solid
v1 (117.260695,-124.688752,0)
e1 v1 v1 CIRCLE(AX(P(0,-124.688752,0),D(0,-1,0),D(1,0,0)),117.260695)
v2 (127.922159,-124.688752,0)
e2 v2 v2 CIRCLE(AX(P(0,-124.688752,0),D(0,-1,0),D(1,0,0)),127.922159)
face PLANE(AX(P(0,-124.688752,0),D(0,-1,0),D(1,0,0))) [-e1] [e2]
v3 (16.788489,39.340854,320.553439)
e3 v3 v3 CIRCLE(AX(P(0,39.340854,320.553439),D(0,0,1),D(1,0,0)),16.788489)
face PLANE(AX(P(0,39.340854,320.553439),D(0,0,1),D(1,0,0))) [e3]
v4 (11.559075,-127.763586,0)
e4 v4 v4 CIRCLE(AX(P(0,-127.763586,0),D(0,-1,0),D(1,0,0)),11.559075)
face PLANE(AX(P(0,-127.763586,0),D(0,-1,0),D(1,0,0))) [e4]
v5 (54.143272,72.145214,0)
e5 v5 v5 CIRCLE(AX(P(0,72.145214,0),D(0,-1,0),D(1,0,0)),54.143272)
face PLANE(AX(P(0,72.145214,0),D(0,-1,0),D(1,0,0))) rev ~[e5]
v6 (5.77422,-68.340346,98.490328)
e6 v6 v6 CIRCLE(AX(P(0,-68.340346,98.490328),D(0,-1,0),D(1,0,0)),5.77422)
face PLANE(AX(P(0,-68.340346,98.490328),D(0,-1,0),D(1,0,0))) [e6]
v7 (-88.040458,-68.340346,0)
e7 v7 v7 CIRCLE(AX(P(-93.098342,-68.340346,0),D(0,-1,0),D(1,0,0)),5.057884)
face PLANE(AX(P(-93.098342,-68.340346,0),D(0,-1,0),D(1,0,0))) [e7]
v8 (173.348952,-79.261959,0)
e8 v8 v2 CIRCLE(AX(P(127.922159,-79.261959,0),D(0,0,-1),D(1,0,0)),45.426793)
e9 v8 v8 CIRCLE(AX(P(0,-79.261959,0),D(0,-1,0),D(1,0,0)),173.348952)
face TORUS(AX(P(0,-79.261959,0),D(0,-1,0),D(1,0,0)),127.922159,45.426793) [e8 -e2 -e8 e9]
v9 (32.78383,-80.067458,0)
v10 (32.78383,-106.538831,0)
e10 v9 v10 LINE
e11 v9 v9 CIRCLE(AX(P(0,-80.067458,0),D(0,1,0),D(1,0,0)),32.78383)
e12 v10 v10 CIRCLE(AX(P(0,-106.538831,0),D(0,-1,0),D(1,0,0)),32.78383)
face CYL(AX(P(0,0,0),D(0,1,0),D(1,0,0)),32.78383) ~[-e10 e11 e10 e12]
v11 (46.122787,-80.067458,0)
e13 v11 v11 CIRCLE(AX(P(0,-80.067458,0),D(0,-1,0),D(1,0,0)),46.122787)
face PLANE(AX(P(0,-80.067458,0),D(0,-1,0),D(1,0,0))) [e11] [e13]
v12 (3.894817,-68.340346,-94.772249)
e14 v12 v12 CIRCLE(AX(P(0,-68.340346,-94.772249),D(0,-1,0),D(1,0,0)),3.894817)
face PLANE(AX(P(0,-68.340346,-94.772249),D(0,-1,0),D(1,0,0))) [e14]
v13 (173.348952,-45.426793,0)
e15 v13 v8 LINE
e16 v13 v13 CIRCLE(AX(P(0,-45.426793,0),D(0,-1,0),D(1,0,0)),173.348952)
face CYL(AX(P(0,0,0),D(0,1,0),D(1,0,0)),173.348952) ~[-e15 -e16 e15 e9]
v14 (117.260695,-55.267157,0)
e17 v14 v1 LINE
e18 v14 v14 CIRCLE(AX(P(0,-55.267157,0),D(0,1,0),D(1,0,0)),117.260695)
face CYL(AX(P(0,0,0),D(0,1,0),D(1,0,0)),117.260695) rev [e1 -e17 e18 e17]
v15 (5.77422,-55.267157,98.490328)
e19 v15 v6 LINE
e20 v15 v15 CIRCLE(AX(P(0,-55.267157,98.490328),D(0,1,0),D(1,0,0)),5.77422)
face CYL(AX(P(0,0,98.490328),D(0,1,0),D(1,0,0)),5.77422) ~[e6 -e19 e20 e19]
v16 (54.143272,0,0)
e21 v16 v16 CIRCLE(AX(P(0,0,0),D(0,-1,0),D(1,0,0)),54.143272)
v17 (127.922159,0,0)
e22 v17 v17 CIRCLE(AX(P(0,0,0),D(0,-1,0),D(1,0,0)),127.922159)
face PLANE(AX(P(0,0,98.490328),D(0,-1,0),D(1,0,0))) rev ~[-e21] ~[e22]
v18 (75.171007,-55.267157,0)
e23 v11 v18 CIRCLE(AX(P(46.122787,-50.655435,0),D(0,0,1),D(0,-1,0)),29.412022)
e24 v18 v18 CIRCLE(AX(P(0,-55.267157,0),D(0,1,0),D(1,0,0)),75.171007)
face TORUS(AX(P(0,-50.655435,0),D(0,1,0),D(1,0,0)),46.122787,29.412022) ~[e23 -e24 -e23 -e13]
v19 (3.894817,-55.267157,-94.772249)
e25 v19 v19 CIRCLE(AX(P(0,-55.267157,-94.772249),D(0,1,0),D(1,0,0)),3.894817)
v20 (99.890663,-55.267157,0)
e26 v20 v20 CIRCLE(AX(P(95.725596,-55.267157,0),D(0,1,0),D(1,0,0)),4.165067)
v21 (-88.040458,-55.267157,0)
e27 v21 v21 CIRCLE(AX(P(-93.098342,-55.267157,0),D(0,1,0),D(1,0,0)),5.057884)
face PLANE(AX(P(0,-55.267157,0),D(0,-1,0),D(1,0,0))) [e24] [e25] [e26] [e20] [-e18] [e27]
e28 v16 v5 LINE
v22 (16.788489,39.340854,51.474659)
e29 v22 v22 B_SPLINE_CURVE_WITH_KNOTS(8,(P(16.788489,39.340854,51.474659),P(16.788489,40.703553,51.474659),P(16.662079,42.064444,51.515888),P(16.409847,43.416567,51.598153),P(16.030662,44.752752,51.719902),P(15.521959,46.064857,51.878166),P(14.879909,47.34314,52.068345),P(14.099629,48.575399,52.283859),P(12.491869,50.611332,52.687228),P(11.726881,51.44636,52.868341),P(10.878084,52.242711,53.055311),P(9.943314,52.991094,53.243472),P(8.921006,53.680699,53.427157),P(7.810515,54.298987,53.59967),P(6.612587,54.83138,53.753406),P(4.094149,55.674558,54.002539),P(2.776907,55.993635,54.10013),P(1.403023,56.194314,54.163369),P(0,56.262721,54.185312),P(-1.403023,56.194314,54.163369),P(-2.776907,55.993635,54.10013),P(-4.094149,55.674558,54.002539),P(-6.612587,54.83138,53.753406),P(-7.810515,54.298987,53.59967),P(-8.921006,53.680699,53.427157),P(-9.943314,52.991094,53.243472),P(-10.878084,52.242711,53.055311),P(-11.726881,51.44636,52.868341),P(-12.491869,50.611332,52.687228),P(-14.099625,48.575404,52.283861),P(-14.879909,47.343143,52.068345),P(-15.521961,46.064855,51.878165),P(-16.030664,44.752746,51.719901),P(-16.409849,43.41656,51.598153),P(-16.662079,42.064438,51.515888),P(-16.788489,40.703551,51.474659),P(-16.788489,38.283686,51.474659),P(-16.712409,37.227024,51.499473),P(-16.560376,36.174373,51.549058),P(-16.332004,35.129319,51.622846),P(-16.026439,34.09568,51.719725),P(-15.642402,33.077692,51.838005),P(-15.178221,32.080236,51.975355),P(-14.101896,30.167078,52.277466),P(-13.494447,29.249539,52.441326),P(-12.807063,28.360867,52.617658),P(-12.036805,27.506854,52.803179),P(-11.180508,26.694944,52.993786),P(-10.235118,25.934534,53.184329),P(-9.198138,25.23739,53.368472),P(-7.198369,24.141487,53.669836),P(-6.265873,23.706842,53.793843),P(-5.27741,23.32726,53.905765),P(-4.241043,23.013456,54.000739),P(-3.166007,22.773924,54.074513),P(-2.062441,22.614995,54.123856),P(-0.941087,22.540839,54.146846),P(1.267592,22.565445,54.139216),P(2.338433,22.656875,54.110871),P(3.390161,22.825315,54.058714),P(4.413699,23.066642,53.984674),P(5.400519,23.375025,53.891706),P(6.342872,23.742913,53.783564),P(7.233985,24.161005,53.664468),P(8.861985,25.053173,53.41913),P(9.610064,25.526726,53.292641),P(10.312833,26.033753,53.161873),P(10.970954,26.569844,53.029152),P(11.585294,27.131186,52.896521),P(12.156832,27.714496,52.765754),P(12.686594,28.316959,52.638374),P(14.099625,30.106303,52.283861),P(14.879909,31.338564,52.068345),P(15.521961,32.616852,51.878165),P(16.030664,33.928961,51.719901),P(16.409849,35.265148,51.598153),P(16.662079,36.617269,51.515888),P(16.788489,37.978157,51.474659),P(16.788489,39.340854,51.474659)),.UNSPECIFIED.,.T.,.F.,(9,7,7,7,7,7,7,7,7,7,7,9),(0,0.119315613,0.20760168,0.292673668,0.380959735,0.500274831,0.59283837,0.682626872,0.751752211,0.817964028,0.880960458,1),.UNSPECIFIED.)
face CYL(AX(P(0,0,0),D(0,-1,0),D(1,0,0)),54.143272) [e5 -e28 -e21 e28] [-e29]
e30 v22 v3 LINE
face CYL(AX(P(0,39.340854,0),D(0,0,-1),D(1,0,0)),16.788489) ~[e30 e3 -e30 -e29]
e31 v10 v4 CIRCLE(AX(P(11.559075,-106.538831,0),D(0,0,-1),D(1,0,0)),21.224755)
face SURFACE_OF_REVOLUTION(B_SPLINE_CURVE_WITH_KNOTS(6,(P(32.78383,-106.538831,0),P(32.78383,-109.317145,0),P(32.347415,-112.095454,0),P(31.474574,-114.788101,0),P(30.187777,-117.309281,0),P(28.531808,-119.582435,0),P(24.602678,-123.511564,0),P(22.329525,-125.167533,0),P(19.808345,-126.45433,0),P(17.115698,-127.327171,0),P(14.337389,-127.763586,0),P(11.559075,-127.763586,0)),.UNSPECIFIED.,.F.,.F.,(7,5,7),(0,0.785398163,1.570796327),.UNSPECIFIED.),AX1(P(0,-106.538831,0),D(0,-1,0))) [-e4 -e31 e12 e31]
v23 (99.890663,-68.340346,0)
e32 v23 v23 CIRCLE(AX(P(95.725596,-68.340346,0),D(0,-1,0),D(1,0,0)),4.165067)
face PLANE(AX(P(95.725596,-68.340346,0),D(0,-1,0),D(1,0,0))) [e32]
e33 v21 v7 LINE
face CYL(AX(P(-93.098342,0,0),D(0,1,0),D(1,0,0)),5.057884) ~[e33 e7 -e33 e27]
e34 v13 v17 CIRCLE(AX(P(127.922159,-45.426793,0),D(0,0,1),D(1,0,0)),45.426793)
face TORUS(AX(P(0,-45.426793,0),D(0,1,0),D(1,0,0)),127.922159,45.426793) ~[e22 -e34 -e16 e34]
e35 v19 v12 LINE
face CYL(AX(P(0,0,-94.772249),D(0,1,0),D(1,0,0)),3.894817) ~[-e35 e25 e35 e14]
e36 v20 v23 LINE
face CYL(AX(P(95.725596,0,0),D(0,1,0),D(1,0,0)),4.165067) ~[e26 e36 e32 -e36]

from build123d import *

# Parameters (mm, degrees)
F0_R      = 173.3489517692
F0_R_2    = 117.2606948697
F1_DEPTH  = 124.6887519956
F2_R      = 45.426792545
F3_R      = 121.2481204934
F4_DEPTH  = 55.2671570331
F5_R      = 75.1710071643
F6_DEPTH  = 80.0674576312
F7_R      = 32.7838298789
F8_DEPTH  = 127.7635861188
F9_R      = 21.2247552793
F11_R     = 54.14327209
F12_DEPTH = 72.1452143043
F13_R     = 16.7884886241
F14_DEPTH = 320.553438738
F15_R     = 5.7742203186
F15_R_2   = 5.0578841716
F15_R_3   = 3.8948170444
F15_R_4   = 4.1650665602
F16_DEPTH = 68.3403462172


# Not quite as in the source:
# - a fillet or chamfer that OpenCascade refuses, or shapes differently, is made with other operations: its cross-section is extruded or revolved along the edge and cut away or added


with BuildPart() as f1:
    # F0 (on Front) → F1 (new body)
    with BuildSketch(Plane.XZ):
        Circle(F0_R)
        Circle(F0_R_2, mode=Mode.SUBTRACT)
    extrude(amount=F1_DEPTH)

    # F2
    f2_edges = [f1.edges().sort_by_distance(p)[0] for p in [
        (-173.348952, 0, 0),
        (-173.348952, -124.688752, 0),
    ]]
    fillet(f2_edges, radius=F2_R)

    # F3 (on Front) → F4 (join)
    with BuildSketch(Plane.XZ):
        Circle(F3_R)
    extrude(amount=F4_DEPTH)

    # F5 (on Front) → F6 (join)
    with BuildSketch(Plane.XZ):
        Circle(F5_R)
    extrude(amount=F6_DEPTH)

    # F7 (on Front) → F8 (join)
    with BuildSketch(Plane.XZ):
        Circle(F7_R)
    extrude(amount=F8_DEPTH)

    # F9
    f9_edges = [f1.edges().sort_by_distance(p)[0] for p in [
        (-32.78383, -127.763586, 0),
    ]]
    fillet(f9_edges, radius=F9_R)

    # F10: fillet of radius 29.4120223151 on 1 edges, made by hand

    # F10_s1 → F10_t2 (revolve, cut)
    with BuildSketch(Plane.XY):
        with BuildLine():
            ThreePointArc((46.1227872623, -80.0674576312), (65.2202608468, -73.0240195216), (75.1710071643, -55.2671570331))
            Line((75.1710071643, -55.2671570331), (75.1710071643, -80.0674576312))
            Line((75.1710071643, -80.0674576312), (46.1227872623, -80.0674576312))
        make_face()
    revolve(axis=Axis((0, -80.0674576312, 0), (0, -1, 0)), mode=Mode.SUBTRACT)

    # F11 (on Front) → F12 (join)
    with BuildSketch(Plane.XZ):
        Circle(F11_R)
    extrude(amount=-F12_DEPTH)

    # F13 (on Top) → F14 (join)
    with BuildSketch(Plane.XY):
        with Locations((0, 39.3408536911)):
            Circle(F13_R)
    extrude(amount=F14_DEPTH)

    # F15 (on Front) → F16 (join)
    with BuildSketch(Plane.XZ):
        with Locations((0, 98.4903275967)):
            Circle(F15_R)
        with Locations((-93.0983424187, 0)):
            Circle(F15_R_2)
        with Locations((0, -94.7722494602)):
            Circle(F15_R_3)
        with Locations((95.7255959511, 0)):
            Circle(F15_R_4)
    extrude(amount=F16_DEPTH)


solid = f1.part
